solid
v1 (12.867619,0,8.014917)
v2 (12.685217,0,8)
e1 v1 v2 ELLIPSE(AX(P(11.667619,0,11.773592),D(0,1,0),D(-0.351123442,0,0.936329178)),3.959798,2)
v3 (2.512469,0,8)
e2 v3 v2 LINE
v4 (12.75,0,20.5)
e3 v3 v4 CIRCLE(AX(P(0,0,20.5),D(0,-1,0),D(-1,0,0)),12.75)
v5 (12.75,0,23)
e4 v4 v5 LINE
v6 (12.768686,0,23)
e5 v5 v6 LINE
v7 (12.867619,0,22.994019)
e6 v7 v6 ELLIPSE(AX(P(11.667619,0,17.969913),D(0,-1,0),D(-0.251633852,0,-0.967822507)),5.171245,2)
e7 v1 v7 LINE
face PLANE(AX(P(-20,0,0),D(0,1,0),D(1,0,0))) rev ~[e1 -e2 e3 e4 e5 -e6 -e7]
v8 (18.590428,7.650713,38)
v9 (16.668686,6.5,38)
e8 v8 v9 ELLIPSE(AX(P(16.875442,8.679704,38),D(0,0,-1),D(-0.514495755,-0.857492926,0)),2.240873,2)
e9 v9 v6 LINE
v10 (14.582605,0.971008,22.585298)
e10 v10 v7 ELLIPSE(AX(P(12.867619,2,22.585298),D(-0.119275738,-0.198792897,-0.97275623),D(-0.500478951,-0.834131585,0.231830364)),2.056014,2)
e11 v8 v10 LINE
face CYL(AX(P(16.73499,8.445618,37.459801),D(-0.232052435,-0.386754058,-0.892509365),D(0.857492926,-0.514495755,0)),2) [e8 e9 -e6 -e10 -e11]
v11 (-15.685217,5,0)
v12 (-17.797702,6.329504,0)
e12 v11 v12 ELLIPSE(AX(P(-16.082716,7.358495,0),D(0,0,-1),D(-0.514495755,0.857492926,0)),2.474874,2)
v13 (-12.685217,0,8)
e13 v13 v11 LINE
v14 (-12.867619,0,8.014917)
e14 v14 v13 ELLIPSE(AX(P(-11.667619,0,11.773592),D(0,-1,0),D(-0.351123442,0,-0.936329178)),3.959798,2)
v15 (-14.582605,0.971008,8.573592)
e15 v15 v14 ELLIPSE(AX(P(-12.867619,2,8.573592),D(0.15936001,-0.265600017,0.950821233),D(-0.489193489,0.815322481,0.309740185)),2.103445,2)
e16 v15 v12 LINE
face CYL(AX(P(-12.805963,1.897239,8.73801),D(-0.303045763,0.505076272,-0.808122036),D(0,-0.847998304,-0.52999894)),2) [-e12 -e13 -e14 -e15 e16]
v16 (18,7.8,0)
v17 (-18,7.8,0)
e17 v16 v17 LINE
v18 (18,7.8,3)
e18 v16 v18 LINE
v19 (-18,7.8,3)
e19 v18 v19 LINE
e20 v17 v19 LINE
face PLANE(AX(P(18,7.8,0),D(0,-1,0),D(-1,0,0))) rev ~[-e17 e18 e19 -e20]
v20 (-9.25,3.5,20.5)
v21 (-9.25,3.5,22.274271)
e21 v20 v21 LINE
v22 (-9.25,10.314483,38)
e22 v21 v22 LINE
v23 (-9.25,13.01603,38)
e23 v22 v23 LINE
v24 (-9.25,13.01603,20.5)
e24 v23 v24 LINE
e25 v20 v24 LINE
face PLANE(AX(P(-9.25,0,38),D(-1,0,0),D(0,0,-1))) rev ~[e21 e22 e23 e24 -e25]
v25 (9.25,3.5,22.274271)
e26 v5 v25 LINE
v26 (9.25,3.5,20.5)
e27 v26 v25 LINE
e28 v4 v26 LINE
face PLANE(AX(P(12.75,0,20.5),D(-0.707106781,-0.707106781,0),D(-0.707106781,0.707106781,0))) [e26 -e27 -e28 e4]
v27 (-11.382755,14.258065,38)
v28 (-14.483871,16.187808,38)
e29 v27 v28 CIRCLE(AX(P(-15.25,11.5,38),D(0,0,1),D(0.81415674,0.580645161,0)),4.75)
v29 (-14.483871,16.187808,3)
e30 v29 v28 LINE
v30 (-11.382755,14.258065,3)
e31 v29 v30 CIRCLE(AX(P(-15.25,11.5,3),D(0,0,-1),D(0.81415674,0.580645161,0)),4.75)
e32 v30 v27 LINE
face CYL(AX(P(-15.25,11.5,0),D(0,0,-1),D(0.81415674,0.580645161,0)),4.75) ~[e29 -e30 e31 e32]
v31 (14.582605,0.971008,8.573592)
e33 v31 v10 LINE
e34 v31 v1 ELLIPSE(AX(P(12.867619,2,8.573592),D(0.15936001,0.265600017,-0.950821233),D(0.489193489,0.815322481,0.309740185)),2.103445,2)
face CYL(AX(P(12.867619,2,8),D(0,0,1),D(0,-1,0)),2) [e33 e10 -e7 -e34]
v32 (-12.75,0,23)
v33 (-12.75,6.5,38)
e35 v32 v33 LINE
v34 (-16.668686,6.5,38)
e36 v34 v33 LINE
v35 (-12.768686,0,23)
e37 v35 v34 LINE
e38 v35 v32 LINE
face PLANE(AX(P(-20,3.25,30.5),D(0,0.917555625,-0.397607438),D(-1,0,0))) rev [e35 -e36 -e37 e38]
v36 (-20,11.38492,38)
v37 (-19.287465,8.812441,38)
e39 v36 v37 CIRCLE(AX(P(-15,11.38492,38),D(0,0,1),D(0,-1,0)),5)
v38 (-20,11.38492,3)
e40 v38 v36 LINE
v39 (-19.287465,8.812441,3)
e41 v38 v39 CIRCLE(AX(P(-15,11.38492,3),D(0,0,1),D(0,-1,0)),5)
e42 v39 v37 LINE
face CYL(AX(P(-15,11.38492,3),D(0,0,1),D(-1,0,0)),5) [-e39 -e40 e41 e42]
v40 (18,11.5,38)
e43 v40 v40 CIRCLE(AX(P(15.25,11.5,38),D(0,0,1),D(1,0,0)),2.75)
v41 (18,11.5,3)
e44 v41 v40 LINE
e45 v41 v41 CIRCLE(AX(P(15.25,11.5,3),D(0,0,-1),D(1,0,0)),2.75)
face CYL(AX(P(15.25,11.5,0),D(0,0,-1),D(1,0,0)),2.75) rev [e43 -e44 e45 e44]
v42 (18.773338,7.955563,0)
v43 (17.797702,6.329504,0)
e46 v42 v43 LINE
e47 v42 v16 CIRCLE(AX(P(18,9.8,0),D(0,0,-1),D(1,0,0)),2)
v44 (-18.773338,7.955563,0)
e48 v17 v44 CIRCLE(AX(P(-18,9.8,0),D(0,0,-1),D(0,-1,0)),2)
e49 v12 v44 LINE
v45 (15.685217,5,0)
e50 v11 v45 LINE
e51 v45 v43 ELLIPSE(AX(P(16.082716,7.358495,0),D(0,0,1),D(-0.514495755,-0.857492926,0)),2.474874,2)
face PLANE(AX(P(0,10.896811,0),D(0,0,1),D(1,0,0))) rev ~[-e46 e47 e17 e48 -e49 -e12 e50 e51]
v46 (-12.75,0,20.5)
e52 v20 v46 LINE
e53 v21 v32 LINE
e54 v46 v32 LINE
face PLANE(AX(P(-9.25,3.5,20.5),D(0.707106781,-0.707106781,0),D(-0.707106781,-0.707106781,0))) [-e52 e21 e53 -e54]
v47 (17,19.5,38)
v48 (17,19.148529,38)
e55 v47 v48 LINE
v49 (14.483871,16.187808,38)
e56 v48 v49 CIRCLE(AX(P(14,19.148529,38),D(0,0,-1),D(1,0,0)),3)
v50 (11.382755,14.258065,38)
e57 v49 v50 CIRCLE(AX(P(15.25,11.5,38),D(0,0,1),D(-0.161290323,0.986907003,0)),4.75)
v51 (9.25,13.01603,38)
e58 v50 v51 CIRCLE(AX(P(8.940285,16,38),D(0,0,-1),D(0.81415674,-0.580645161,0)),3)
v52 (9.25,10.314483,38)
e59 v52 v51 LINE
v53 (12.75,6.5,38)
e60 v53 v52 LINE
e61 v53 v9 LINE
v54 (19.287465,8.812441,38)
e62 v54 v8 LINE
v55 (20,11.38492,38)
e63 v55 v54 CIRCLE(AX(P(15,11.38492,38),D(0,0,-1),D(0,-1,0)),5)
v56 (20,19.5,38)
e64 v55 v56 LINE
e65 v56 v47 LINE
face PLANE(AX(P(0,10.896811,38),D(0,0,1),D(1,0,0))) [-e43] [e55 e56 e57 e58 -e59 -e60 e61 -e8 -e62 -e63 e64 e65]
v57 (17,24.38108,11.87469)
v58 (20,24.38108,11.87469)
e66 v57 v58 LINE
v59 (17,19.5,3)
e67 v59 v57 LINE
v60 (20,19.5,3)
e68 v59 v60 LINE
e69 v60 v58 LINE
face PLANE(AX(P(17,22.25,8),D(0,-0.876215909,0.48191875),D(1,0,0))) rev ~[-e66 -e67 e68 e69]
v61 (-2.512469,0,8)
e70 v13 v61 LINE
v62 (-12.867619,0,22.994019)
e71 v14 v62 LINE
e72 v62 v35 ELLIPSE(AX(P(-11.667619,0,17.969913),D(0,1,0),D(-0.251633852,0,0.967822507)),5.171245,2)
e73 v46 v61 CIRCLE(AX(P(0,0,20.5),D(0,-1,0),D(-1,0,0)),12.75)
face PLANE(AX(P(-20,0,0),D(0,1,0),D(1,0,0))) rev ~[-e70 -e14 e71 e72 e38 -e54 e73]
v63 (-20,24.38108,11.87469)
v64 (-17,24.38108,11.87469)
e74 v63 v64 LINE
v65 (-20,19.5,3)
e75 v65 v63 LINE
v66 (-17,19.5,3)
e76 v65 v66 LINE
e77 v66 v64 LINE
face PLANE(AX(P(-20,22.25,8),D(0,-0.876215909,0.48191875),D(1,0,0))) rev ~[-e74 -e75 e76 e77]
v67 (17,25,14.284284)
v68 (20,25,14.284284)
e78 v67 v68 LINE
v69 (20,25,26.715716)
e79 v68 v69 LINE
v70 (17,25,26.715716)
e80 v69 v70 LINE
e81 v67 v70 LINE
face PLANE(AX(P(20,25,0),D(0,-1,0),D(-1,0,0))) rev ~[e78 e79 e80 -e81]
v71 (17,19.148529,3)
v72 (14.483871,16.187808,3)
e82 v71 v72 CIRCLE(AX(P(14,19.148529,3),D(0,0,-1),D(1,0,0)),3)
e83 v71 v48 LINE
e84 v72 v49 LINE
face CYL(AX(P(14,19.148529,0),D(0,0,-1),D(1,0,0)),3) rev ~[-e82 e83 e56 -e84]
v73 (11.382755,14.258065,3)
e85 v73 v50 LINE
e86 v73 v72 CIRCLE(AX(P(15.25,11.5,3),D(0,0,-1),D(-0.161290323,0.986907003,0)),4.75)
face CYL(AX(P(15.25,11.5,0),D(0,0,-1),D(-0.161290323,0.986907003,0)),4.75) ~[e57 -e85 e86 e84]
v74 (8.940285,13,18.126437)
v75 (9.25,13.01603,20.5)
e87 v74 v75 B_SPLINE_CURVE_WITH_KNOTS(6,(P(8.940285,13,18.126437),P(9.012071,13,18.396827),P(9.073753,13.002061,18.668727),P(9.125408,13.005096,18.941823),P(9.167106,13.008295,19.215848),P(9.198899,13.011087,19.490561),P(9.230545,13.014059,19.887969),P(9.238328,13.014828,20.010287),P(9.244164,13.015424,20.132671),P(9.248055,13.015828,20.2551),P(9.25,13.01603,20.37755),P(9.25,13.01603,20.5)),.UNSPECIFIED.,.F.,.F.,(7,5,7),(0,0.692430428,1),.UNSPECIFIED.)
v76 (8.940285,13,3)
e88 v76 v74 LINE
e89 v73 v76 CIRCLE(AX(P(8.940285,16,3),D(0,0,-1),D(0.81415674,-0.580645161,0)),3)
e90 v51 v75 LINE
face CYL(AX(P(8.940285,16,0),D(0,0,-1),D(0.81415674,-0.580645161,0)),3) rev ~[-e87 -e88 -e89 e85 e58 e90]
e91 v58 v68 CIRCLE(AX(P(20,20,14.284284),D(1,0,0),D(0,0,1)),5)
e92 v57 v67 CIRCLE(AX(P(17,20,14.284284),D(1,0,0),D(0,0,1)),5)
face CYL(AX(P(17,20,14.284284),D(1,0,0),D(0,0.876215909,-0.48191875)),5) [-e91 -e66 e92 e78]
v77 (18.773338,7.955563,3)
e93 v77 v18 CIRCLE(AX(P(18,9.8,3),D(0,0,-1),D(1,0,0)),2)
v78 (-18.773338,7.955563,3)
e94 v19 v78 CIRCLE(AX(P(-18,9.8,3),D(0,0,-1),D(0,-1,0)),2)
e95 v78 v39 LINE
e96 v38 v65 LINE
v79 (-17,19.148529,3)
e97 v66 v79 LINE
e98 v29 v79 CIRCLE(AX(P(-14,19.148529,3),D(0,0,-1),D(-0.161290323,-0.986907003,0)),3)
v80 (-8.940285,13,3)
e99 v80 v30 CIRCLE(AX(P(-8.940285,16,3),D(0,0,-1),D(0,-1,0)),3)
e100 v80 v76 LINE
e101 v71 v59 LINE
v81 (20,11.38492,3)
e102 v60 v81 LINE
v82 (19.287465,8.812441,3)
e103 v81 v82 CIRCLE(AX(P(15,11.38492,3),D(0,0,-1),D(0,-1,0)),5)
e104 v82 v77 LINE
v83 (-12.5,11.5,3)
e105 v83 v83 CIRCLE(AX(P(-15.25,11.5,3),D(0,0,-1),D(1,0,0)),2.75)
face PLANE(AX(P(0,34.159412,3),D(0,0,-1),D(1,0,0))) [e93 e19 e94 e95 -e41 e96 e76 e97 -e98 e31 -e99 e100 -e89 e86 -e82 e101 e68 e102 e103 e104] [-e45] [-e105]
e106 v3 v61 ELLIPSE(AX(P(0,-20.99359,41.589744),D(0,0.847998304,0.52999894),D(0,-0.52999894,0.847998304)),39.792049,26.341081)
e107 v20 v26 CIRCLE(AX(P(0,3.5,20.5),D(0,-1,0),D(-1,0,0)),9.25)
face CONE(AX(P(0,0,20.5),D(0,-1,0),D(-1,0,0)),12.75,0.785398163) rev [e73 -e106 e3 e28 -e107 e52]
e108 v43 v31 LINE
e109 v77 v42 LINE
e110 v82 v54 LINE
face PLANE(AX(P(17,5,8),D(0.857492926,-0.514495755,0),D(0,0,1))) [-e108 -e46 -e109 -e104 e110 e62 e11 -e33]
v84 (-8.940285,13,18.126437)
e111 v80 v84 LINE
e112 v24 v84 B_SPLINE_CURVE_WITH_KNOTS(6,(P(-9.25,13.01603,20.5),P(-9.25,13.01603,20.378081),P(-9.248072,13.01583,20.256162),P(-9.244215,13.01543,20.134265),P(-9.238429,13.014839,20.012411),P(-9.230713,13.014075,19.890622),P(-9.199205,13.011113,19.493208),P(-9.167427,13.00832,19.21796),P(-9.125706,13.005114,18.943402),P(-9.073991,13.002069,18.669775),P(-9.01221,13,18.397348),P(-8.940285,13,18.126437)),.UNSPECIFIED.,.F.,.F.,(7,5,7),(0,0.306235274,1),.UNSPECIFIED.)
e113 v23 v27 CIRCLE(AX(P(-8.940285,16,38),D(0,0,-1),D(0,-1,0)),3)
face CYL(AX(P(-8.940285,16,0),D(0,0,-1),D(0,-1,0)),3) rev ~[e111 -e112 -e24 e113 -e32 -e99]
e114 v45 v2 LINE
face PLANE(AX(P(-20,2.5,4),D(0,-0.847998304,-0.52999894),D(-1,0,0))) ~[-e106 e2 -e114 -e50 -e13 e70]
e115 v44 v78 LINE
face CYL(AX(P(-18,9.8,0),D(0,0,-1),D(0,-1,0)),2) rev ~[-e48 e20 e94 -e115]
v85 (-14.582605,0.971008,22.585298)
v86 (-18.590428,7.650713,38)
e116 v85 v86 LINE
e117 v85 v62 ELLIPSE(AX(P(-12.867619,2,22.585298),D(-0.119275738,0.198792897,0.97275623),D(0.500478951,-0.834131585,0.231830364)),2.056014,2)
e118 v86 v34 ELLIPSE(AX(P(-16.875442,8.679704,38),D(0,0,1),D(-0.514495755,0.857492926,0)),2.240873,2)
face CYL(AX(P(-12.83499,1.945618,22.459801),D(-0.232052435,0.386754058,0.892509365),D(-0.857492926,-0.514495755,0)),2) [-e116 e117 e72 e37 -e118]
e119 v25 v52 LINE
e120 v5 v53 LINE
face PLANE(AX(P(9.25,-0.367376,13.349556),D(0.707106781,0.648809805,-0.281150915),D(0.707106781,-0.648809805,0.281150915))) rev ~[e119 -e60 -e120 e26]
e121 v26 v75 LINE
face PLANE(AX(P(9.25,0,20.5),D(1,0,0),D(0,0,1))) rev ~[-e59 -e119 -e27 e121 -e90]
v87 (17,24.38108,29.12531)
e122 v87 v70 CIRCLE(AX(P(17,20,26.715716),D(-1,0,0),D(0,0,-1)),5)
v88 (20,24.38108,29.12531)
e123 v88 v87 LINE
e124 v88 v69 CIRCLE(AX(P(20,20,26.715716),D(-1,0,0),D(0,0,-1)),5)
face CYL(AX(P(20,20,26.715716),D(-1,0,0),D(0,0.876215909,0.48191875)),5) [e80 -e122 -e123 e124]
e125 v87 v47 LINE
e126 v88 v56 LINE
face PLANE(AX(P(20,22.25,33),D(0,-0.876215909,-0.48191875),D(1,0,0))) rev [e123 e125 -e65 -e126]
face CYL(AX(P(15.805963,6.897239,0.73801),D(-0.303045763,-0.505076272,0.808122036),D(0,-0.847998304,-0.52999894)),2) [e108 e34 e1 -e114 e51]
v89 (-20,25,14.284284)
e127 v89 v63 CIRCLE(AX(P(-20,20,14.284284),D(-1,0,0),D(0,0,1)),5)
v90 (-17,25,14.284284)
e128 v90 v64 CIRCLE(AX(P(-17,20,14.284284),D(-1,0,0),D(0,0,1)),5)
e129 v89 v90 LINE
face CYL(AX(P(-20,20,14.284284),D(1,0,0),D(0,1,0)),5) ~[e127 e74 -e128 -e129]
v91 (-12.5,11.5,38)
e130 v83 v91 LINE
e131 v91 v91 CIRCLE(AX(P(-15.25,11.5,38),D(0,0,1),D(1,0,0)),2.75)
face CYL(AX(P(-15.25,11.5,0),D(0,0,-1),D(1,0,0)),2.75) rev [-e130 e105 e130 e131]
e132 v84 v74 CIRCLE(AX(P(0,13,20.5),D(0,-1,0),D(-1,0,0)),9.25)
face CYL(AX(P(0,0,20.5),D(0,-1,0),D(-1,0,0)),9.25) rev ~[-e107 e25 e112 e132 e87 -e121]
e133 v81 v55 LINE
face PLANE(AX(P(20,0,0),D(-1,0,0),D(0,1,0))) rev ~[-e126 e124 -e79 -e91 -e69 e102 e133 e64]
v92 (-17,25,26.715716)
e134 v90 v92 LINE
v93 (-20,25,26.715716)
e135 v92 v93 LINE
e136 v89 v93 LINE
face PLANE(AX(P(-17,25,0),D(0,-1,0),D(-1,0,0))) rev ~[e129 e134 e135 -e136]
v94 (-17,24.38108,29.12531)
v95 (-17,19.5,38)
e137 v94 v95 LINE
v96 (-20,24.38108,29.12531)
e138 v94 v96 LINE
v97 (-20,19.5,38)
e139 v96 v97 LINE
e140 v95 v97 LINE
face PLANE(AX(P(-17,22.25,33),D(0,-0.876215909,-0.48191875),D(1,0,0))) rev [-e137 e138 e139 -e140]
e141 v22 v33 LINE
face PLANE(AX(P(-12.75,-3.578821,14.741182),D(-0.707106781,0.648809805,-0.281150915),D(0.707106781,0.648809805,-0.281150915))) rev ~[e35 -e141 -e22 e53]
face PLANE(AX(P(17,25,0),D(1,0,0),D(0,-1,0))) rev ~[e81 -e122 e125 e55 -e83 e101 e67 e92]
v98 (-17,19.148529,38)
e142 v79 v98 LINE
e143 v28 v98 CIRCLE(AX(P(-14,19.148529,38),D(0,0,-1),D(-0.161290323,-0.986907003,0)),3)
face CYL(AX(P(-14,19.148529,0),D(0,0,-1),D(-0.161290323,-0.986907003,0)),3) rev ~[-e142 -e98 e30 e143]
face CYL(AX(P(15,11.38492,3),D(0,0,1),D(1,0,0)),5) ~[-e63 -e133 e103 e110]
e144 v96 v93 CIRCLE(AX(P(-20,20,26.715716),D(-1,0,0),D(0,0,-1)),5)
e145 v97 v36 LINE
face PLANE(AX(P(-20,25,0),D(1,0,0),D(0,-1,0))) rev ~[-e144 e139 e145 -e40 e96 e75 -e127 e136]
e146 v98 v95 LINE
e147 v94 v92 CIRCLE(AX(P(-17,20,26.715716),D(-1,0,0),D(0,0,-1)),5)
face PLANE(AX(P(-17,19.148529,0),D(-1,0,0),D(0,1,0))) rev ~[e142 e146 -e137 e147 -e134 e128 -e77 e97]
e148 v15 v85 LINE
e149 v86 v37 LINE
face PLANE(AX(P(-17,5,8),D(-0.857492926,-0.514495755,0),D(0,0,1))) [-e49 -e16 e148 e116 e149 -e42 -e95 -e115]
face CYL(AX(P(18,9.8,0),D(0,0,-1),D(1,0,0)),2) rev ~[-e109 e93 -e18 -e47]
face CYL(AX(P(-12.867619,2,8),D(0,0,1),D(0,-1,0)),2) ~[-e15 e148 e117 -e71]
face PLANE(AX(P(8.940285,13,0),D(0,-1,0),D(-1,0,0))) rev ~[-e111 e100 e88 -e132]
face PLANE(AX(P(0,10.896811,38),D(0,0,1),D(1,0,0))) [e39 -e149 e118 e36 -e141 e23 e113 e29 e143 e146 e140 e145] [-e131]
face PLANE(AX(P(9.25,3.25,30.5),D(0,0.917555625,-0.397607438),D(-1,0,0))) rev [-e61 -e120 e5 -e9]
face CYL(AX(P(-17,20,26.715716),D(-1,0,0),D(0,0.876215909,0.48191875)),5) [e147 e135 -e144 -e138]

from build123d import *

# Parameters (mm, degrees)
F0_R         = 2.75
F1_DEPTH     = 38
F3_DEPTH     = 3
F5_DEPTH     = 25
F6_SIZE2     = 5
F6_SIZE      = 8
F7_SIZE2     = 6.5
F7_SIZE      = 15
F8_SIZE2     = 6
F8_SIZE      = 10
F9_SIZE2     = 10
F9_SIZE      = 6
F10_R        = 2
F11_C1_SIZE2 = 10
F11_C1_SIZE  = 5.5
F11_C2_SIZE2 = 10
F11_C2_SIZE  = 5.5
F12_SIZE2    = 5.5
F12_SIZE     = 10
F12_2_SIZE2  = 5.5
F12_2_SIZE   = 10
F13_R        = 5
F14_R        = 5
F15_T1_DEPTH = 34.34956364
F15_T3_DEPTH = 11.5008904579
F15_T6_ANGLE = 180


# Not quite as in the source:
# - a fillet or chamfer that OpenCascade refuses, or shapes differently, is made with other operations: its cross-section is extruded or revolved along the edge and cut away or added


with BuildPart() as f1:
    # F0 (on Top) → F1 (new body)
    with BuildSketch(Plane.XY):
        with BuildLine():
            Line((-17, 25), (-20, 25))
            Line((-20, 25), (-20, 0))
            Line((-20, 0), (20, 0))
            Line((20, 0), (20, 25))
            Line((20, 25), (17, 25))
            Line((17, 25), (17, 19.1485292704))
            ThreePointArc((17, 19.1485292704), (16.286002286, 17.205800893), (14.4838709677, 16.1878082625))
            ThreePointArc((14.4838709677, 16.1878082625), (12.7404153064, 15.5329250756), (11.3827554868, 14.2580645161))
            ThreePointArc((11.3827554868, 14.2580645161), (10.3140016776, 13.332997333), (8.9402852679, 13))
            Line((8.9402852679, 13), (-8.9402852679, 13))
            ThreePointArc((-8.9402852679, 13), (-10.3140016776, 13.332997333), (-11.3827554868, 14.2580645161))
            ThreePointArc((-11.3827554868, 14.2580645161), (-12.7404153064, 15.5329250756), (-14.4838709677, 16.1878082625))
            ThreePointArc((-14.4838709677, 16.1878082625), (-16.286002286, 17.205800893), (-17, 19.1485292704))
            Line((-17, 19.1485292704), (-17, 25))
        make_face()
        with Locations((-15.25, 11.5)):
            Circle(F0_R, mode=Mode.SUBTRACT)
        with Locations((15.25, 11.5)):
            Circle(F0_R, mode=Mode.SUBTRACT)
    extrude(amount=F1_DEPTH)

    # F2 (on face) → F3 (cut)
    with BuildSketch(Plane(origin=(0, 0, 0), x_dir=(1, 0, 0), z_dir=(0, 0, -1))):
        with BuildLine():
            Line((18, -7.8), (-18, -7.8))
            ThreePointArc((-18, -7.8), (-19.4142135624, -8.3857864376), (-20, -9.8))
            Line((-20, -9.8), (-20, -60))
            Line((-20, -60), (20, -60))
            Line((20, -60), (20, -9.8))
            ThreePointArc((20, -9.8), (19.4142135624, -8.3857864376), (18, -7.8))
        make_face()
    extrude(amount=-F3_DEPTH, mode=Mode.SUBTRACT)

    # F4 (on face) → F5 (cut)
    with BuildSketch(Plane.XZ):
        with BuildLine():
            Line((-9.25, 38), (-9.25, 20.5))
            ThreePointArc((-9.25, 20.5), (0, 11.25), (9.25, 20.5))
            Line((9.25, 20.5), (9.25, 38))
            Line((9.25, 38), (-9.25, 38))
        make_face()
    extrude(amount=-F5_DEPTH, mode=Mode.SUBTRACT)

    # F6
    f6_edges = [f1.edges().sort_by_distance(p)[0] for p in [
        (0, 0, 0),
    ]]
    f6_side = f1.faces().sort_by_distance((0, 0, 0.551725))[0]
    chamfer(f6_edges, length=F6_SIZE, length2=F6_SIZE2, reference=f6_side)

    # F7
    f7_edges = [f1.edges().sort_by_distance(p)[0] for p in [
        (-14.625, 0, 38),
        (14.625, 0, 38),
    ]]
    f7_side = f1.faces().sort_by_distance((19.5, 0, 23))[0]
    chamfer(f7_edges, length=F7_SIZE, length2=F7_SIZE2, reference=f7_side)

    # F8
    f8_edges = [f1.edges().sort_by_distance(p)[0] for p in [
        (20, 0, 15.5),
    ]]
    f8_side = f1.faces().sort_by_distance((20, 13.094719, 19.529129))[0]
    chamfer(f8_edges, length=F8_SIZE, length2=F8_SIZE2, reference=f8_side)

    # F9
    f9_edges = [f1.edges().sort_by_distance(p)[0] for p in [
        (-20, 0, 15.5),
    ]]
    f9_side = f1.faces().sort_by_distance((11.625, 0, 22.628382))[0]
    chamfer(f9_edges, length=F9_SIZE, length2=F9_SIZE2, reference=f9_side)

    # F10
    f10_edges = [f1.edges().sort_by_distance(p)[0] for p in [
        (15.95, 3.25, 30.5),
        (-15.95, 3.25, 30.5),
        (14, 0, 15.5),
        (-14, 0, 15.5),
        (-15.5, 2.5, 4),
        (15.5, 2.5, 4),
    ]]
    fillet(f10_edges, radius=F10_R)

    # F11: chamfer of 10 x 5.5 on 2 edges, made by hand

    # F11_c1
    f11_c1_edges = [f1.edges().sort_by_distance(p)[0] for p in [
        (-18.5, 25, 3),
    ]]
    f11_c1_side = f1.faces().sort_by_distance((-18.5, 24.89, 3))[0]
    chamfer(f11_c1_edges, length=F11_C1_SIZE, length2=F11_C1_SIZE2, reference=f11_c1_side)

    # F11_c2
    f11_c2_edges = [f1.edges().sort_by_distance(p)[0] for p in [
        (18.5, 25, 3),
    ]]
    f11_c2_side = f1.faces().sort_by_distance((18.5, 24.89, 3))[0]
    chamfer(f11_c2_edges, length=F11_C2_SIZE, length2=F11_C2_SIZE2, reference=f11_c2_side)

    # F12
    f12_edges = [f1.edges().sort_by_distance(p)[0] for p in [
        (18.5, 25, 38),
    ]]
    f12_side = f1.faces().sort_by_distance((18.5, 25, 25.5))[0]
    chamfer(f12_edges, length=F12_SIZE, length2=F12_SIZE2, reference=f12_side)

    # F12#2
    f12_2_edges = [f1.edges().sort_by_distance(p)[0] for p in [
        (-18.5, 25, 38),
    ]]
    f12_2_side = f1.faces().sort_by_distance((-18.5, 25, 25.5))[0]
    chamfer(f12_2_edges, length=F12_2_SIZE, length2=F12_2_SIZE2, reference=f12_2_side)

    # F13
    f13_edges = [f1.edges().sort_by_distance(p)[0] for p in [
        (20, 10, 20.5),
        (-20, 10, 20.5),
    ]]
    fillet(f13_edges, radius=F13_R)

    # F14
    f14_edges = [f1.edges().sort_by_distance(p)[0] for p in [
        (18.5, 25, 28),
        (18.5, 25, 13),
        (-18.5, 25, 13),
        (-18.5, 25, 28),
    ]]
    fillet(f14_edges, radius=F14_R)

    # F15: chamfer of 3.5 on 5 edges, made by hand

    # F15_s2 → F15_t1 (cut)
    with BuildSketch(Plane(origin=(0, 4.8121986531, 11.1050738149), x_dir=(1, 0, 0), z_dir=(0, 0.3976074376, 0.9175556253))):
        Polygon((-12.75, -9.1449710656), (-9.25, -5.6449710656), (-9.25, -9.1449710656), align=None)
        Polygon((9.25, -5.6449710656), (12.75, -9.1449710656), (9.25, -9.1449710656), align=None)
    extrude(amount=F15_T1_DEPTH, mode=Mode.SUBTRACT)

    # F15_s4 → F15_t3 (cut)
    with BuildSketch(Plane.XY.offset(20.5)):
        Polygon((-9.25, 3.5), (-12.75, 0), (-9.25, 0), align=None)
        Polygon((12.75, 0), (9.25, 3.5), (9.25, 0), align=None)
    extrude(amount=F15_T3_DEPTH, mode=Mode.SUBTRACT)

    # F15_s5 → F15_t6 (revolve, cut)
    with BuildSketch(Plane.XY.offset(20.5)):
        Polygon((-12.75, 0), (-9.25, 3.5), (-9.25, 0), align=None)
    revolve(axis=Axis((0, 0, 20.5), (0, -1, 0)), revolution_arc=F15_T6_ANGLE, mode=Mode.SUBTRACT)


solid = f1.part
